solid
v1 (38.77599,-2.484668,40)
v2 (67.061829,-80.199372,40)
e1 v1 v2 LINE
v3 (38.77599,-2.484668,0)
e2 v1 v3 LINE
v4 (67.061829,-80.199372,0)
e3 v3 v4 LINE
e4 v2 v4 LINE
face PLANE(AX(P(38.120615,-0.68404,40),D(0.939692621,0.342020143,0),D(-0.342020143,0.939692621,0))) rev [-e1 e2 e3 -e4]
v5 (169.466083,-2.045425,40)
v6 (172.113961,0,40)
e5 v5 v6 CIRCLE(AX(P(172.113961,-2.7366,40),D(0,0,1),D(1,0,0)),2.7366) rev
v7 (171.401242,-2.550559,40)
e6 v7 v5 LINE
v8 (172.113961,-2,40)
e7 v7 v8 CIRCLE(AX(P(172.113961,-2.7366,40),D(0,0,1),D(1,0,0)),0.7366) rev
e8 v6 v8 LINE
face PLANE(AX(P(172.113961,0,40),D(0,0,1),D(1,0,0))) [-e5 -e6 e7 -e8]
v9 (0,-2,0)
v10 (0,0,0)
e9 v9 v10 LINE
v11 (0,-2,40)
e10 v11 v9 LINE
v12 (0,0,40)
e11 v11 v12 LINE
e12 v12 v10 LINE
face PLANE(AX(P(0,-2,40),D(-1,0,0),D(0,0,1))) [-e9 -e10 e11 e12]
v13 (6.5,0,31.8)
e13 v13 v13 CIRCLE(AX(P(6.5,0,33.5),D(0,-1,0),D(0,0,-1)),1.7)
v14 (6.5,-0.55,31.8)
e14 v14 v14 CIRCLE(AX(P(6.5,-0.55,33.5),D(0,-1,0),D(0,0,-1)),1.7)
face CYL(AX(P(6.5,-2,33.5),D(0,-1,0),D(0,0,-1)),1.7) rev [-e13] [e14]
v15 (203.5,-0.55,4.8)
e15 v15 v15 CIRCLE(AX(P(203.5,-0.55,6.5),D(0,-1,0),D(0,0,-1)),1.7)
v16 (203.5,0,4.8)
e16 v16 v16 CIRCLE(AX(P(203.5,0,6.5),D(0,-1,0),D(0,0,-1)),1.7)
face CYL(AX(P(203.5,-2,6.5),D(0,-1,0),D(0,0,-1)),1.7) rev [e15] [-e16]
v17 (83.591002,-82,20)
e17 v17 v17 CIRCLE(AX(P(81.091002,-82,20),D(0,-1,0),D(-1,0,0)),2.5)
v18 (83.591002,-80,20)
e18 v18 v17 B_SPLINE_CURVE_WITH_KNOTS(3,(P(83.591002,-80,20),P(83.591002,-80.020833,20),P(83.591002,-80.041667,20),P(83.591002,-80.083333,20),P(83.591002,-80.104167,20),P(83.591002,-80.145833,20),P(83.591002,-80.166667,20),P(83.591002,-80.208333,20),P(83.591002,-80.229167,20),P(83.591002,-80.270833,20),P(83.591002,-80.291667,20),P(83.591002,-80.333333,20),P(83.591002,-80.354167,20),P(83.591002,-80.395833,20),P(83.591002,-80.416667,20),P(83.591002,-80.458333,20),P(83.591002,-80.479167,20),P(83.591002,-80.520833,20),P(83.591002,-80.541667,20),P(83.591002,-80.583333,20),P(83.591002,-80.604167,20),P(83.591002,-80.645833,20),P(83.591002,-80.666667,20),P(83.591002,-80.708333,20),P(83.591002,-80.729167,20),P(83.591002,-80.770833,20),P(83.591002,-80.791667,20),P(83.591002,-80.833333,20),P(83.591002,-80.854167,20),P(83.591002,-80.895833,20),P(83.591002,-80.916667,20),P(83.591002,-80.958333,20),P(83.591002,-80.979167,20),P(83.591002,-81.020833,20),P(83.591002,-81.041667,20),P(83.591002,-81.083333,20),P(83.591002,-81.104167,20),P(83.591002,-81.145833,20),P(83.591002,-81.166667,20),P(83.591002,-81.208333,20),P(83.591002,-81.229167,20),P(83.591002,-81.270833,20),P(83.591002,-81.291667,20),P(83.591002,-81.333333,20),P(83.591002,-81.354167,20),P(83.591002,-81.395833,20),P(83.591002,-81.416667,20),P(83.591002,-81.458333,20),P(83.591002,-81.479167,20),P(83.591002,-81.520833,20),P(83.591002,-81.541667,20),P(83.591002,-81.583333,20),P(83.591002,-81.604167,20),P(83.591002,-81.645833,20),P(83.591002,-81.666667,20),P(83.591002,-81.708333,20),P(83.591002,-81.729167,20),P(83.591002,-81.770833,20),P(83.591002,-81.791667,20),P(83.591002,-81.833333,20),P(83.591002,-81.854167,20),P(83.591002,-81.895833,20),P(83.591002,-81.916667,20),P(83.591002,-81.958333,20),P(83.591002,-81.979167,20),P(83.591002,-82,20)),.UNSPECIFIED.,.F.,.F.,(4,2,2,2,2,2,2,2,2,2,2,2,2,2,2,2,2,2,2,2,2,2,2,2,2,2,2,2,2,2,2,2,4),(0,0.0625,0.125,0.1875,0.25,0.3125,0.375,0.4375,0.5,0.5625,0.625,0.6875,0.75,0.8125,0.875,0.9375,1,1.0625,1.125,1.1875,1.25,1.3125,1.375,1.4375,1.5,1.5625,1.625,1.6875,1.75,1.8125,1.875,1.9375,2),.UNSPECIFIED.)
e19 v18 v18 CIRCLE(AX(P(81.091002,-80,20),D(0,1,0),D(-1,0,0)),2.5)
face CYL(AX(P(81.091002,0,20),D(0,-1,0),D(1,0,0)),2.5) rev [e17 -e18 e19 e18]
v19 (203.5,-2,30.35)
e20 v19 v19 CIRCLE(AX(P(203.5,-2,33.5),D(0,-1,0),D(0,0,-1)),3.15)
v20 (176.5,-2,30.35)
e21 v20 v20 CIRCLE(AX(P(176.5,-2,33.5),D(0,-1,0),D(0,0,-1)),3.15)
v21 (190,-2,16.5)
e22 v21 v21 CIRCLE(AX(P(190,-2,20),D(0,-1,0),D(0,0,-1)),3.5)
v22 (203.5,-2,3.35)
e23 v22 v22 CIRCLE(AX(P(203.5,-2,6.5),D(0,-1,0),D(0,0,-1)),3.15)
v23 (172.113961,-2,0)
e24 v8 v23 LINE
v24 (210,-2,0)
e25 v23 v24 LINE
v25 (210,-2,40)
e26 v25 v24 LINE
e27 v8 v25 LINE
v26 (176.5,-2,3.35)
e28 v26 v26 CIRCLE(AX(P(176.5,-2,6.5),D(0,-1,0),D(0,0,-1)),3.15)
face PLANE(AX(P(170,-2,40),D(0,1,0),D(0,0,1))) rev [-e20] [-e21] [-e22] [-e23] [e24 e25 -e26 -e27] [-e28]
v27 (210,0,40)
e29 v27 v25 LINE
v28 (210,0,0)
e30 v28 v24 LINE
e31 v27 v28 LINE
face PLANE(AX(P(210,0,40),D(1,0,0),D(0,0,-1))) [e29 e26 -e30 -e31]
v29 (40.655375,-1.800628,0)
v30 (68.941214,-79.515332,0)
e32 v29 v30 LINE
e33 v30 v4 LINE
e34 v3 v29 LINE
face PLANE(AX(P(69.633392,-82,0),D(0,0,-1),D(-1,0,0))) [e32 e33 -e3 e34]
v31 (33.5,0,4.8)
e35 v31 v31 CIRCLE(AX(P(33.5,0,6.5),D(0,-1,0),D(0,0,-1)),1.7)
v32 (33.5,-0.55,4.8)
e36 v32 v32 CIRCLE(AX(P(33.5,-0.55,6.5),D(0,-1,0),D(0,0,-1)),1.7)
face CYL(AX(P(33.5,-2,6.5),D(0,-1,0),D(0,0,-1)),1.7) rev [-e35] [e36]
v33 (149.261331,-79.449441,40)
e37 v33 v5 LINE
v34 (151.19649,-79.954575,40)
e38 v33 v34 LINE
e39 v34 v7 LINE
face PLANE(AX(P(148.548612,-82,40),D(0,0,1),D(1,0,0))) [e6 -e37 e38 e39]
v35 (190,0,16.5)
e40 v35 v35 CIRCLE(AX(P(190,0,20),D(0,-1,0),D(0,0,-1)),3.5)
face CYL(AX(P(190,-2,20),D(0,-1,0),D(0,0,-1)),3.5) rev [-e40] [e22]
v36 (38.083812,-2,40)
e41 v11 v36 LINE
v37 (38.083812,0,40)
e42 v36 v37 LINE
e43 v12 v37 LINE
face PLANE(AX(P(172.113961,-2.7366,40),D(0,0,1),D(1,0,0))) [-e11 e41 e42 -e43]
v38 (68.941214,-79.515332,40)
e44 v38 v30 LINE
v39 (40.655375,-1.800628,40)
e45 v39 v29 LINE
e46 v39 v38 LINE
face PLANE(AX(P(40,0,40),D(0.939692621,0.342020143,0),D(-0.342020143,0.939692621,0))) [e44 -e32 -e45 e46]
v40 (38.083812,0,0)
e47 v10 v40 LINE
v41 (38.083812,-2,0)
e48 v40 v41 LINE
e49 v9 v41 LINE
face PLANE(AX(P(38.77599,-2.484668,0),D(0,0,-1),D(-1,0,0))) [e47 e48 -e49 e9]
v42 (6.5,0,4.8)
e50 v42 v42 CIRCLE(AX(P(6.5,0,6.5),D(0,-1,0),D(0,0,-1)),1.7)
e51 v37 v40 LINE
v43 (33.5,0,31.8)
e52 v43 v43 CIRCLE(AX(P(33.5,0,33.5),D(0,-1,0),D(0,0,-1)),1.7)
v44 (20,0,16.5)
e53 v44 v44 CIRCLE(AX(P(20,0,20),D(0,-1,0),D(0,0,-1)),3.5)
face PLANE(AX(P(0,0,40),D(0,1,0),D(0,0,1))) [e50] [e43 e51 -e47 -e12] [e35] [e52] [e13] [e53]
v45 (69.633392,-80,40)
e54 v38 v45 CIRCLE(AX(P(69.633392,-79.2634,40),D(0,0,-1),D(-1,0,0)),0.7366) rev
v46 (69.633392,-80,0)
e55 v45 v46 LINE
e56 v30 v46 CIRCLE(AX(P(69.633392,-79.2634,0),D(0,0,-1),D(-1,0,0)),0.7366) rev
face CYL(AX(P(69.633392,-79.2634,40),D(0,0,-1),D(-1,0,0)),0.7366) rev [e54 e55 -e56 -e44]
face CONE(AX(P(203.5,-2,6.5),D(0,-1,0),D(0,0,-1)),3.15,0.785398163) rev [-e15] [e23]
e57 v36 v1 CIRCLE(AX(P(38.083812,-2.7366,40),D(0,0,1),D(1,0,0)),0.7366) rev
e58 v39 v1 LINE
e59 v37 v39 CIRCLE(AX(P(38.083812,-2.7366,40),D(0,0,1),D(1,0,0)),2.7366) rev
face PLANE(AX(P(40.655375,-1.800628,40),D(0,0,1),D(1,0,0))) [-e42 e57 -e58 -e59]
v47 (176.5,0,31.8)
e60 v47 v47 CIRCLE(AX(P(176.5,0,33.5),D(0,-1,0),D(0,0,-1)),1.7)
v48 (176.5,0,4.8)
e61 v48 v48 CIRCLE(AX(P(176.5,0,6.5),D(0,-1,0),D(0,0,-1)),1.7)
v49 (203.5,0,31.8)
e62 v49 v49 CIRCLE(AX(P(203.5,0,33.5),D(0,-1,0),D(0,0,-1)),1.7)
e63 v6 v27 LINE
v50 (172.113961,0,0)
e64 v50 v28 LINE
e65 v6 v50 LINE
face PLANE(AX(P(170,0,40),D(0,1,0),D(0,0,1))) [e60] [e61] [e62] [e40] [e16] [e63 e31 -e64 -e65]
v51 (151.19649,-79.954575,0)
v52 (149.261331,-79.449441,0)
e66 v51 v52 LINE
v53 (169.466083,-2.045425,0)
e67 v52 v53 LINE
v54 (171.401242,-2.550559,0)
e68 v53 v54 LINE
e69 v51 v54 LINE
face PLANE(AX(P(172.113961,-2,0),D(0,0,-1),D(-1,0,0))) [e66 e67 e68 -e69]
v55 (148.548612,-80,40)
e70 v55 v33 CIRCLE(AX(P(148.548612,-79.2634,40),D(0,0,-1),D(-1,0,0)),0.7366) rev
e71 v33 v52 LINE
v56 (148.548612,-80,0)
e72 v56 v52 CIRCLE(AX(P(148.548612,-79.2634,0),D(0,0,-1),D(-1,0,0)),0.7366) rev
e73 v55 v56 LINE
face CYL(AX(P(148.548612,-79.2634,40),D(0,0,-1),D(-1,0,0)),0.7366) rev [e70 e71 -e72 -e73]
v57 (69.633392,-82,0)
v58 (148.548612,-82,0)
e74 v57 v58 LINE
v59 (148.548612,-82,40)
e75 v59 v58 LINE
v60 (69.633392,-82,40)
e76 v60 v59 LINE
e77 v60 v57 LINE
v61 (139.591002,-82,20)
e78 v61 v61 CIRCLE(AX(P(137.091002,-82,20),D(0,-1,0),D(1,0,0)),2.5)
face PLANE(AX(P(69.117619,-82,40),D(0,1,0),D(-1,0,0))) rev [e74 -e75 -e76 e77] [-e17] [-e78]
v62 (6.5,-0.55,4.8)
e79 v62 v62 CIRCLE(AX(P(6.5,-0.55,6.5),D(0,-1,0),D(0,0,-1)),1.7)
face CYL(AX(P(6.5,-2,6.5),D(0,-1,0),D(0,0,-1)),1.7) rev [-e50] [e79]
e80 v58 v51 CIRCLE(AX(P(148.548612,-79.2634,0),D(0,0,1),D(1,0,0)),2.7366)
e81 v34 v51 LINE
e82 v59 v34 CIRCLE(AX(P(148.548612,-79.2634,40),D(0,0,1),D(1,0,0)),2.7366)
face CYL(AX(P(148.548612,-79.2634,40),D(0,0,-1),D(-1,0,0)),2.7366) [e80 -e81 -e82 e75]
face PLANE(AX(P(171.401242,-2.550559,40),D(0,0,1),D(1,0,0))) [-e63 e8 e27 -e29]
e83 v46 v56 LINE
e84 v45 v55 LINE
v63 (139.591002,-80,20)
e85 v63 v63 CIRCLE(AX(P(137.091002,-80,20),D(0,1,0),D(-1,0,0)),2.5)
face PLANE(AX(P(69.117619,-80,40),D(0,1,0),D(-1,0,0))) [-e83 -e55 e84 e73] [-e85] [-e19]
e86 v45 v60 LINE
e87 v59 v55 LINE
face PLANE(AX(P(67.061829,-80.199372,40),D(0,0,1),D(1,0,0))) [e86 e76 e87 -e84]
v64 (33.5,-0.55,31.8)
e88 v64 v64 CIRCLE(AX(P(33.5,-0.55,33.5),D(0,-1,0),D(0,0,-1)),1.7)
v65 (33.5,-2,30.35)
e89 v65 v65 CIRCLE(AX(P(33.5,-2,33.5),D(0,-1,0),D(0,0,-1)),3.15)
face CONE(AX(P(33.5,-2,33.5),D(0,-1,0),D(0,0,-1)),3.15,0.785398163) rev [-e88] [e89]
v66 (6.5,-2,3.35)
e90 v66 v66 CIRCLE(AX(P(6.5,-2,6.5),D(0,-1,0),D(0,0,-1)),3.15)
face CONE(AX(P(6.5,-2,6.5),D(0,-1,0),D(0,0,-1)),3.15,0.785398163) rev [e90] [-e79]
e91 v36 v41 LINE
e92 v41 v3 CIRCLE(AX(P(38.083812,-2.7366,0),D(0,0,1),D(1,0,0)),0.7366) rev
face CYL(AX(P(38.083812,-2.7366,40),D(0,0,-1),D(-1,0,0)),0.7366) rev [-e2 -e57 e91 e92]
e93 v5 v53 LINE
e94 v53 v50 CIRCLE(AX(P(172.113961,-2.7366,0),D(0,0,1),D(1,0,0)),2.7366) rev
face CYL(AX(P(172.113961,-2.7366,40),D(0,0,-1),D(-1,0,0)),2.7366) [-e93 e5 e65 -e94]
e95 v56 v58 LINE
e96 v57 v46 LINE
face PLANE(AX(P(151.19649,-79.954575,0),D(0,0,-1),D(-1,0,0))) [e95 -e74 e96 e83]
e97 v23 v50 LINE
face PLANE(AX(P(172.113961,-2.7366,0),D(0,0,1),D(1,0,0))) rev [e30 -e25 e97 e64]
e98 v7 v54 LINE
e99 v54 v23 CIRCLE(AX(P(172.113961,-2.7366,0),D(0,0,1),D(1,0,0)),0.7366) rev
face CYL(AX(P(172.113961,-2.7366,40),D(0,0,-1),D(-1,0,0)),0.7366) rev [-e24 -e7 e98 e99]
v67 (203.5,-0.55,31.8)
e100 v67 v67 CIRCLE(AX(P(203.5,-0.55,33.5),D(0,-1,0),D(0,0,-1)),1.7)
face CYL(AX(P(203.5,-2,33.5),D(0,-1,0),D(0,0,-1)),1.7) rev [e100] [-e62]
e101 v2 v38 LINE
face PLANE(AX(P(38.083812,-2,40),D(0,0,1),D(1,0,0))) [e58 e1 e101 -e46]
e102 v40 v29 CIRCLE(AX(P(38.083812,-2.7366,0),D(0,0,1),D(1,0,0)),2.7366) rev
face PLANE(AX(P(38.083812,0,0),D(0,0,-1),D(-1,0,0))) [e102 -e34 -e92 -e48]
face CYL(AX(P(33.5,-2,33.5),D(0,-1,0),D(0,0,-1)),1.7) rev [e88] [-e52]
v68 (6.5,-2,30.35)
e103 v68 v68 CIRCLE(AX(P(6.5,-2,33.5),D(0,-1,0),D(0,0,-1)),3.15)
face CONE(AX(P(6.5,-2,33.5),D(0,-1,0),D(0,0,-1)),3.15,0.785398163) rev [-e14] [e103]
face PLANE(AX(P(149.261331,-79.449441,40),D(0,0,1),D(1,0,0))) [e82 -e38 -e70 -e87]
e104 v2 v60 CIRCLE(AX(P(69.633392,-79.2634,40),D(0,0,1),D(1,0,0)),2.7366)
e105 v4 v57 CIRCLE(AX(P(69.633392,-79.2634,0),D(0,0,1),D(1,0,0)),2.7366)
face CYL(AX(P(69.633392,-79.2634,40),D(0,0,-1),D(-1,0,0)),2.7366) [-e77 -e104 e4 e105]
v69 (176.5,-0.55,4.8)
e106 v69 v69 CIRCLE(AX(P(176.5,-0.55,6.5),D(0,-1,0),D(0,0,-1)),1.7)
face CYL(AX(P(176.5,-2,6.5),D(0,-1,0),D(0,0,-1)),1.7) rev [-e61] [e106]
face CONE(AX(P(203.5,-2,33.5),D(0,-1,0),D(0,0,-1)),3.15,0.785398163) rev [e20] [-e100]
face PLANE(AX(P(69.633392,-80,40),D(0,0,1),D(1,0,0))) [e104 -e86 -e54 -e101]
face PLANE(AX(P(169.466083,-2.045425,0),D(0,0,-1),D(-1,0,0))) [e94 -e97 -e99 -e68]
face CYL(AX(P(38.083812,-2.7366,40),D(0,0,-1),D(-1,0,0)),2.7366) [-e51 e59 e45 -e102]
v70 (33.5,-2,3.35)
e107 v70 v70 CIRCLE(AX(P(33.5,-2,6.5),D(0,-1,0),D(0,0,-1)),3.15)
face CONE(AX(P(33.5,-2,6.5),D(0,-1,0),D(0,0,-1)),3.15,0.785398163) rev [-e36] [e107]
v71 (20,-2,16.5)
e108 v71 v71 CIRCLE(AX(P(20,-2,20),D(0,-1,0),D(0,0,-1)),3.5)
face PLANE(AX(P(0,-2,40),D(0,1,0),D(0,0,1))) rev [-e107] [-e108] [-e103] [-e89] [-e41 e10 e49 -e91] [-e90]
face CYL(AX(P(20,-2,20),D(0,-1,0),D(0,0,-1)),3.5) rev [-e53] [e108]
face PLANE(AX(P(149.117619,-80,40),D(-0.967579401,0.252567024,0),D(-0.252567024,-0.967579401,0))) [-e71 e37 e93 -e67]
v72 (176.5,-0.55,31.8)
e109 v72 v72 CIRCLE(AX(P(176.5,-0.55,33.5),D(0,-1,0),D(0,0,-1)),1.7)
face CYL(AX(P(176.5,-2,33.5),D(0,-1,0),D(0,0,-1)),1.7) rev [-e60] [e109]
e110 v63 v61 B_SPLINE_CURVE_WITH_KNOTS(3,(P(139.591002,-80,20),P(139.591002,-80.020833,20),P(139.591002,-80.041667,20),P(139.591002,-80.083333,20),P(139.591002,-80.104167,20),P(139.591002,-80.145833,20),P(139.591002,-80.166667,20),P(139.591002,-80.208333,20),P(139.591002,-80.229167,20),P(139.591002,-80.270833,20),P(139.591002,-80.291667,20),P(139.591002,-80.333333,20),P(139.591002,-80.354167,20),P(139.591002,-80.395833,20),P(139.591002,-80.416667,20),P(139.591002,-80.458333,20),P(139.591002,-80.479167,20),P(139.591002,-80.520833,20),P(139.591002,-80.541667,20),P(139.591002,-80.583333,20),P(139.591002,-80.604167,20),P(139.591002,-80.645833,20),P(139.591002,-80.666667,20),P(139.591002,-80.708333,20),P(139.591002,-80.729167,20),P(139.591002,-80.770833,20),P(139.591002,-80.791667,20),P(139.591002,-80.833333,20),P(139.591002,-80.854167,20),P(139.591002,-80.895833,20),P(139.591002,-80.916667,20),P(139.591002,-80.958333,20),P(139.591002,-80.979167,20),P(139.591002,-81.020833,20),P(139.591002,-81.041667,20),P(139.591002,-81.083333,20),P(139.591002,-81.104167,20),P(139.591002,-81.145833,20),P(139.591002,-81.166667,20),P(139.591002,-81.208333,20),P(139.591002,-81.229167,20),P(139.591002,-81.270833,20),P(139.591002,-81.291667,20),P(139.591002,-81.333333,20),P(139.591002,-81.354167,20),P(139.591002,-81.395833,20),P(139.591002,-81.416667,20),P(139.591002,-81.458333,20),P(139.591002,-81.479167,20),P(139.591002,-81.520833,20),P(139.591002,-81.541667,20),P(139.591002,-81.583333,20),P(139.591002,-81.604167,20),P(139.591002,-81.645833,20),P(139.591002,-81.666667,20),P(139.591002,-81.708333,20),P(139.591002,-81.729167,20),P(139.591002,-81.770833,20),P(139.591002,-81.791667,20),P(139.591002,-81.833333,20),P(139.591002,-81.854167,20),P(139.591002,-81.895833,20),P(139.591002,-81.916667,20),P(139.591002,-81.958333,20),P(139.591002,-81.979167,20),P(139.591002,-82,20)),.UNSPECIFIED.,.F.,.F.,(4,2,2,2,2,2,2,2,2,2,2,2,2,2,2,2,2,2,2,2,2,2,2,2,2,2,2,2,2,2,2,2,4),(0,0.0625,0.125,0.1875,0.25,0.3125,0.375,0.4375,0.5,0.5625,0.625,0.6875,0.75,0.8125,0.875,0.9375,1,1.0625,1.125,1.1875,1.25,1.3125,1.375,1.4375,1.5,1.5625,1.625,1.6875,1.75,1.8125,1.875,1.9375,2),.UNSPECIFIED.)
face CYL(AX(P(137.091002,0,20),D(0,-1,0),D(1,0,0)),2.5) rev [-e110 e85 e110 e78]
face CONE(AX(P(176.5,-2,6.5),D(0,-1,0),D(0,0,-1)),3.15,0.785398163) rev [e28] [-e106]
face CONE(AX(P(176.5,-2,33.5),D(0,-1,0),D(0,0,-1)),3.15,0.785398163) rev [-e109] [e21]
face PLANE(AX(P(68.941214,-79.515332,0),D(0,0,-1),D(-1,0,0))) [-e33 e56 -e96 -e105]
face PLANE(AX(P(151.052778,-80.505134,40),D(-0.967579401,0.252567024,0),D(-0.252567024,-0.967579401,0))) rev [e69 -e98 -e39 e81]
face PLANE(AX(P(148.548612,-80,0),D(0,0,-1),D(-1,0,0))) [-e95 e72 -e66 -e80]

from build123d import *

# Parameters (mm, degrees)
SM_BASE_FLANGE_1_DEPTH      = 40
SKETCH_6_R                  = 2.5
CUT_EXTRUDE_1_DEPTH         = 229.962879087
HOLE_WIZARD_M3_1_AT_2_COUNT = 2
HOLE_WIZARD_M3_1_AT_2_PITCH = 27
HOLE_WIZARD_M3_1_AT_3_COUNT = 2
HOLE_WIZARD_M3_1_AT_3_PITCH = 38.183766184
HOLE_WIZARD_M3_1_AT_4_COUNT = 2
HOLE_WIZARD_M3_1_AT_4_PITCH = 27
HOLE_WIZARD_M3_1_AT_5_COUNT = 2
HOLE_WIZARD_M3_1_AT_5_PITCH = 172.130764246
HOLE_WIZARD_M3_1_AT_6_COUNT = 2
HOLE_WIZARD_M3_1_AT_6_PITCH = 198.841645537
HOLE_WIZARD_M3_1_AT_7_COUNT = 2
HOLE_WIZARD_M3_1_AT_7_PITCH = 170
HOLE_WIZARD_M3_1_AT_8_COUNT = 2
HOLE_WIZARD_M3_1_AT_8_PITCH = 197
HOLE_WIZARD_7_0_7_1_D       = 7
HOLE_WIZARD_7_0_7_1_DEPTH   = 2
HOLE_WIZARD_7_0_7_1_TIP     = 2.103012167


# Sheet-metal steps are written as plain solids
with BuildPart() as part:
    # Sketch 1 → 基材-凸緣1 (new body)
    with BuildSketch(Plane.XY):
        with BuildLine():
            Line((0, 0), (38.083812051, 0))
            ThreePointArc((38.083812051, 0), (39.653461327, -0.494908516), (40.655374877, -1.800627676))
            Line((40.655374877, -1.800627676), (68.941214029, -79.515332038))
            ThreePointArc((68.941214029, -79.515332038), (69.210895211, -79.866787396), (69.633391614, -80))
            Line((69.633391614, -80), (148.548612075, -80))
            ThreePointArc((148.548612075, -80), (148.998913005, -79.84633107), (149.261331062, -79.44944087))
            Line((149.261331062, -79.44944087), (169.46608317, -2.045425081))
            ThreePointArc((169.46608317, -2.045425081), (170.441012922, -0.570907404), (172.11396096, 0))
            Line((172.11396096, 0), (210, 0))
            Line((210, 0), (210, -2))
            Line((210, -2), (172.11396096, -2))
            ThreePointArc((172.11396096, -2), (171.66366003, -2.15366893), (171.401241973, -2.55055913))
            Line((171.401241973, -2.55055913), (151.196489865, -79.954574919))
            ThreePointArc((151.196489865, -79.954574919), (150.221560113, -81.429092596), (148.548612075, -82))
            Line((148.548612075, -82), (69.633391614, -82))
            ThreePointArc((69.633391614, -82), (68.063742338, -81.505091484), (67.061828788, -80.199372324))
            Line((67.061828788, -80.199372324), (38.775989635, -2.484667962))
            ThreePointArc((38.775989635, -2.484667962), (38.506308454, -2.133212604), (38.083812051, -2))
            Line((38.083812051, -2), (0, -2))
            Line((0, -2), (0, 0))
        make_face()
    extrude(amount=SM_BASE_FLANGE_1_DEPTH)

    # 草圖6 → 除料-伸長1 (cut, through all)
    with BuildSketch(Plane.XZ.offset(82)):
        with Locations((137.091001844, 20)):
            Circle(SKETCH_6_R)
        with Locations((81.091001844, 20)):
            Circle(SKETCH_6_R)
    extrude(amount=-CUT_EXTRUDE_1_DEPTH, mode=Mode.SUBTRACT)

    # 草圖13 → M3 高錐坑頭螺釘的錐孔1 (revolve, cut)
    with BuildSketch(Plane(origin=(6.5, -2, 33.5), x_dir=(0, 0, -1), z_dir=(1, 0, 0))):
        Polygon((0, 0), (0, 3.021463052), (1.7, 2), (1.7, 1.45), (3.15, 0), align=None)
    hole_wizard_m3_1 = revolve(axis=Axis((6.5, -8.35, 33.5), (0, 1, 0)), mode=Mode.SUBTRACT)

    # M3 高錐坑頭螺釘的錐孔1 at 2: M3 高錐坑頭螺釘的錐孔1 ×2
    with Locations(*[(i * HOLE_WIZARD_M3_1_AT_2_PITCH, 0, 0) for i in range(1, HOLE_WIZARD_M3_1_AT_2_COUNT)]):
        add(hole_wizard_m3_1, mode=Mode.SUBTRACT)

    # M3 高錐坑頭螺釘的錐孔1 at 3: M3 高錐坑頭螺釘的錐孔1 ×2
    with Locations(*[Vector(0.7071067811865476, 0, -0.7071067811865476) * (i * HOLE_WIZARD_M3_1_AT_3_PITCH) for i in range(1, HOLE_WIZARD_M3_1_AT_3_COUNT)]):
        add(hole_wizard_m3_1, mode=Mode.SUBTRACT)

    # M3 高錐坑頭螺釘的錐孔1 at 4: M3 高錐坑頭螺釘的錐孔1 ×2
    with Locations(*[(0, 0, -i * HOLE_WIZARD_M3_1_AT_4_PITCH) for i in range(1, HOLE_WIZARD_M3_1_AT_4_COUNT)]):
        add(hole_wizard_m3_1, mode=Mode.SUBTRACT)

    # M3 高錐坑頭螺釘的錐孔1 at 5: M3 高錐坑頭螺釘的錐孔1 ×2
    with Locations(*[Vector(0.9876212468143859, 0, -0.15685749214110833) * (i * HOLE_WIZARD_M3_1_AT_5_PITCH) for i in range(1, HOLE_WIZARD_M3_1_AT_5_COUNT)]):
        add(hole_wizard_m3_1, mode=Mode.SUBTRACT)

    # M3 高錐坑頭螺釘的錐孔1 at 6: M3 高錐坑頭螺釘的錐孔1 ×2
    with Locations(*[Vector(0.9907381296691129, 0, -0.13578644416784796) * (i * HOLE_WIZARD_M3_1_AT_6_PITCH) for i in range(1, HOLE_WIZARD_M3_1_AT_6_COUNT)]):
        add(hole_wizard_m3_1, mode=Mode.SUBTRACT)

    # M3 高錐坑頭螺釘的錐孔1 at 7: M3 高錐坑頭螺釘的錐孔1 ×2
    with Locations(*[(i * HOLE_WIZARD_M3_1_AT_7_PITCH, 0, 0) for i in range(1, HOLE_WIZARD_M3_1_AT_7_COUNT)]):
        add(hole_wizard_m3_1, mode=Mode.SUBTRACT)

    # M3 高錐坑頭螺釘的錐孔1 at 8: M3 高錐坑頭螺釘的錐孔1 ×2
    with Locations(*[(i * HOLE_WIZARD_M3_1_AT_8_PITCH, 0, 0) for i in range(1, HOLE_WIZARD_M3_1_AT_8_COUNT)]):
        add(hole_wizard_m3_1, mode=Mode.SUBTRACT)

    # Ø7.0 (7) 直徑孔1
    with Locations(Plane(origin=(0, -2, 0), x_dir=(-1, 0, 0), z_dir=(0, -1, 0))):
        with Locations((-20, -20), (-190, -20)):
            Hole(HOLE_WIZARD_7_0_7_1_D / 2, depth=HOLE_WIZARD_7_0_7_1_DEPTH)
            with Locations((0, 0, -(HOLE_WIZARD_7_0_7_1_DEPTH + HOLE_WIZARD_7_0_7_1_TIP / 2))):  # 118° drill point
                Cone(0, HOLE_WIZARD_7_0_7_1_D / 2, HOLE_WIZARD_7_0_7_1_TIP, mode=Mode.SUBTRACT)


solid = part.part
